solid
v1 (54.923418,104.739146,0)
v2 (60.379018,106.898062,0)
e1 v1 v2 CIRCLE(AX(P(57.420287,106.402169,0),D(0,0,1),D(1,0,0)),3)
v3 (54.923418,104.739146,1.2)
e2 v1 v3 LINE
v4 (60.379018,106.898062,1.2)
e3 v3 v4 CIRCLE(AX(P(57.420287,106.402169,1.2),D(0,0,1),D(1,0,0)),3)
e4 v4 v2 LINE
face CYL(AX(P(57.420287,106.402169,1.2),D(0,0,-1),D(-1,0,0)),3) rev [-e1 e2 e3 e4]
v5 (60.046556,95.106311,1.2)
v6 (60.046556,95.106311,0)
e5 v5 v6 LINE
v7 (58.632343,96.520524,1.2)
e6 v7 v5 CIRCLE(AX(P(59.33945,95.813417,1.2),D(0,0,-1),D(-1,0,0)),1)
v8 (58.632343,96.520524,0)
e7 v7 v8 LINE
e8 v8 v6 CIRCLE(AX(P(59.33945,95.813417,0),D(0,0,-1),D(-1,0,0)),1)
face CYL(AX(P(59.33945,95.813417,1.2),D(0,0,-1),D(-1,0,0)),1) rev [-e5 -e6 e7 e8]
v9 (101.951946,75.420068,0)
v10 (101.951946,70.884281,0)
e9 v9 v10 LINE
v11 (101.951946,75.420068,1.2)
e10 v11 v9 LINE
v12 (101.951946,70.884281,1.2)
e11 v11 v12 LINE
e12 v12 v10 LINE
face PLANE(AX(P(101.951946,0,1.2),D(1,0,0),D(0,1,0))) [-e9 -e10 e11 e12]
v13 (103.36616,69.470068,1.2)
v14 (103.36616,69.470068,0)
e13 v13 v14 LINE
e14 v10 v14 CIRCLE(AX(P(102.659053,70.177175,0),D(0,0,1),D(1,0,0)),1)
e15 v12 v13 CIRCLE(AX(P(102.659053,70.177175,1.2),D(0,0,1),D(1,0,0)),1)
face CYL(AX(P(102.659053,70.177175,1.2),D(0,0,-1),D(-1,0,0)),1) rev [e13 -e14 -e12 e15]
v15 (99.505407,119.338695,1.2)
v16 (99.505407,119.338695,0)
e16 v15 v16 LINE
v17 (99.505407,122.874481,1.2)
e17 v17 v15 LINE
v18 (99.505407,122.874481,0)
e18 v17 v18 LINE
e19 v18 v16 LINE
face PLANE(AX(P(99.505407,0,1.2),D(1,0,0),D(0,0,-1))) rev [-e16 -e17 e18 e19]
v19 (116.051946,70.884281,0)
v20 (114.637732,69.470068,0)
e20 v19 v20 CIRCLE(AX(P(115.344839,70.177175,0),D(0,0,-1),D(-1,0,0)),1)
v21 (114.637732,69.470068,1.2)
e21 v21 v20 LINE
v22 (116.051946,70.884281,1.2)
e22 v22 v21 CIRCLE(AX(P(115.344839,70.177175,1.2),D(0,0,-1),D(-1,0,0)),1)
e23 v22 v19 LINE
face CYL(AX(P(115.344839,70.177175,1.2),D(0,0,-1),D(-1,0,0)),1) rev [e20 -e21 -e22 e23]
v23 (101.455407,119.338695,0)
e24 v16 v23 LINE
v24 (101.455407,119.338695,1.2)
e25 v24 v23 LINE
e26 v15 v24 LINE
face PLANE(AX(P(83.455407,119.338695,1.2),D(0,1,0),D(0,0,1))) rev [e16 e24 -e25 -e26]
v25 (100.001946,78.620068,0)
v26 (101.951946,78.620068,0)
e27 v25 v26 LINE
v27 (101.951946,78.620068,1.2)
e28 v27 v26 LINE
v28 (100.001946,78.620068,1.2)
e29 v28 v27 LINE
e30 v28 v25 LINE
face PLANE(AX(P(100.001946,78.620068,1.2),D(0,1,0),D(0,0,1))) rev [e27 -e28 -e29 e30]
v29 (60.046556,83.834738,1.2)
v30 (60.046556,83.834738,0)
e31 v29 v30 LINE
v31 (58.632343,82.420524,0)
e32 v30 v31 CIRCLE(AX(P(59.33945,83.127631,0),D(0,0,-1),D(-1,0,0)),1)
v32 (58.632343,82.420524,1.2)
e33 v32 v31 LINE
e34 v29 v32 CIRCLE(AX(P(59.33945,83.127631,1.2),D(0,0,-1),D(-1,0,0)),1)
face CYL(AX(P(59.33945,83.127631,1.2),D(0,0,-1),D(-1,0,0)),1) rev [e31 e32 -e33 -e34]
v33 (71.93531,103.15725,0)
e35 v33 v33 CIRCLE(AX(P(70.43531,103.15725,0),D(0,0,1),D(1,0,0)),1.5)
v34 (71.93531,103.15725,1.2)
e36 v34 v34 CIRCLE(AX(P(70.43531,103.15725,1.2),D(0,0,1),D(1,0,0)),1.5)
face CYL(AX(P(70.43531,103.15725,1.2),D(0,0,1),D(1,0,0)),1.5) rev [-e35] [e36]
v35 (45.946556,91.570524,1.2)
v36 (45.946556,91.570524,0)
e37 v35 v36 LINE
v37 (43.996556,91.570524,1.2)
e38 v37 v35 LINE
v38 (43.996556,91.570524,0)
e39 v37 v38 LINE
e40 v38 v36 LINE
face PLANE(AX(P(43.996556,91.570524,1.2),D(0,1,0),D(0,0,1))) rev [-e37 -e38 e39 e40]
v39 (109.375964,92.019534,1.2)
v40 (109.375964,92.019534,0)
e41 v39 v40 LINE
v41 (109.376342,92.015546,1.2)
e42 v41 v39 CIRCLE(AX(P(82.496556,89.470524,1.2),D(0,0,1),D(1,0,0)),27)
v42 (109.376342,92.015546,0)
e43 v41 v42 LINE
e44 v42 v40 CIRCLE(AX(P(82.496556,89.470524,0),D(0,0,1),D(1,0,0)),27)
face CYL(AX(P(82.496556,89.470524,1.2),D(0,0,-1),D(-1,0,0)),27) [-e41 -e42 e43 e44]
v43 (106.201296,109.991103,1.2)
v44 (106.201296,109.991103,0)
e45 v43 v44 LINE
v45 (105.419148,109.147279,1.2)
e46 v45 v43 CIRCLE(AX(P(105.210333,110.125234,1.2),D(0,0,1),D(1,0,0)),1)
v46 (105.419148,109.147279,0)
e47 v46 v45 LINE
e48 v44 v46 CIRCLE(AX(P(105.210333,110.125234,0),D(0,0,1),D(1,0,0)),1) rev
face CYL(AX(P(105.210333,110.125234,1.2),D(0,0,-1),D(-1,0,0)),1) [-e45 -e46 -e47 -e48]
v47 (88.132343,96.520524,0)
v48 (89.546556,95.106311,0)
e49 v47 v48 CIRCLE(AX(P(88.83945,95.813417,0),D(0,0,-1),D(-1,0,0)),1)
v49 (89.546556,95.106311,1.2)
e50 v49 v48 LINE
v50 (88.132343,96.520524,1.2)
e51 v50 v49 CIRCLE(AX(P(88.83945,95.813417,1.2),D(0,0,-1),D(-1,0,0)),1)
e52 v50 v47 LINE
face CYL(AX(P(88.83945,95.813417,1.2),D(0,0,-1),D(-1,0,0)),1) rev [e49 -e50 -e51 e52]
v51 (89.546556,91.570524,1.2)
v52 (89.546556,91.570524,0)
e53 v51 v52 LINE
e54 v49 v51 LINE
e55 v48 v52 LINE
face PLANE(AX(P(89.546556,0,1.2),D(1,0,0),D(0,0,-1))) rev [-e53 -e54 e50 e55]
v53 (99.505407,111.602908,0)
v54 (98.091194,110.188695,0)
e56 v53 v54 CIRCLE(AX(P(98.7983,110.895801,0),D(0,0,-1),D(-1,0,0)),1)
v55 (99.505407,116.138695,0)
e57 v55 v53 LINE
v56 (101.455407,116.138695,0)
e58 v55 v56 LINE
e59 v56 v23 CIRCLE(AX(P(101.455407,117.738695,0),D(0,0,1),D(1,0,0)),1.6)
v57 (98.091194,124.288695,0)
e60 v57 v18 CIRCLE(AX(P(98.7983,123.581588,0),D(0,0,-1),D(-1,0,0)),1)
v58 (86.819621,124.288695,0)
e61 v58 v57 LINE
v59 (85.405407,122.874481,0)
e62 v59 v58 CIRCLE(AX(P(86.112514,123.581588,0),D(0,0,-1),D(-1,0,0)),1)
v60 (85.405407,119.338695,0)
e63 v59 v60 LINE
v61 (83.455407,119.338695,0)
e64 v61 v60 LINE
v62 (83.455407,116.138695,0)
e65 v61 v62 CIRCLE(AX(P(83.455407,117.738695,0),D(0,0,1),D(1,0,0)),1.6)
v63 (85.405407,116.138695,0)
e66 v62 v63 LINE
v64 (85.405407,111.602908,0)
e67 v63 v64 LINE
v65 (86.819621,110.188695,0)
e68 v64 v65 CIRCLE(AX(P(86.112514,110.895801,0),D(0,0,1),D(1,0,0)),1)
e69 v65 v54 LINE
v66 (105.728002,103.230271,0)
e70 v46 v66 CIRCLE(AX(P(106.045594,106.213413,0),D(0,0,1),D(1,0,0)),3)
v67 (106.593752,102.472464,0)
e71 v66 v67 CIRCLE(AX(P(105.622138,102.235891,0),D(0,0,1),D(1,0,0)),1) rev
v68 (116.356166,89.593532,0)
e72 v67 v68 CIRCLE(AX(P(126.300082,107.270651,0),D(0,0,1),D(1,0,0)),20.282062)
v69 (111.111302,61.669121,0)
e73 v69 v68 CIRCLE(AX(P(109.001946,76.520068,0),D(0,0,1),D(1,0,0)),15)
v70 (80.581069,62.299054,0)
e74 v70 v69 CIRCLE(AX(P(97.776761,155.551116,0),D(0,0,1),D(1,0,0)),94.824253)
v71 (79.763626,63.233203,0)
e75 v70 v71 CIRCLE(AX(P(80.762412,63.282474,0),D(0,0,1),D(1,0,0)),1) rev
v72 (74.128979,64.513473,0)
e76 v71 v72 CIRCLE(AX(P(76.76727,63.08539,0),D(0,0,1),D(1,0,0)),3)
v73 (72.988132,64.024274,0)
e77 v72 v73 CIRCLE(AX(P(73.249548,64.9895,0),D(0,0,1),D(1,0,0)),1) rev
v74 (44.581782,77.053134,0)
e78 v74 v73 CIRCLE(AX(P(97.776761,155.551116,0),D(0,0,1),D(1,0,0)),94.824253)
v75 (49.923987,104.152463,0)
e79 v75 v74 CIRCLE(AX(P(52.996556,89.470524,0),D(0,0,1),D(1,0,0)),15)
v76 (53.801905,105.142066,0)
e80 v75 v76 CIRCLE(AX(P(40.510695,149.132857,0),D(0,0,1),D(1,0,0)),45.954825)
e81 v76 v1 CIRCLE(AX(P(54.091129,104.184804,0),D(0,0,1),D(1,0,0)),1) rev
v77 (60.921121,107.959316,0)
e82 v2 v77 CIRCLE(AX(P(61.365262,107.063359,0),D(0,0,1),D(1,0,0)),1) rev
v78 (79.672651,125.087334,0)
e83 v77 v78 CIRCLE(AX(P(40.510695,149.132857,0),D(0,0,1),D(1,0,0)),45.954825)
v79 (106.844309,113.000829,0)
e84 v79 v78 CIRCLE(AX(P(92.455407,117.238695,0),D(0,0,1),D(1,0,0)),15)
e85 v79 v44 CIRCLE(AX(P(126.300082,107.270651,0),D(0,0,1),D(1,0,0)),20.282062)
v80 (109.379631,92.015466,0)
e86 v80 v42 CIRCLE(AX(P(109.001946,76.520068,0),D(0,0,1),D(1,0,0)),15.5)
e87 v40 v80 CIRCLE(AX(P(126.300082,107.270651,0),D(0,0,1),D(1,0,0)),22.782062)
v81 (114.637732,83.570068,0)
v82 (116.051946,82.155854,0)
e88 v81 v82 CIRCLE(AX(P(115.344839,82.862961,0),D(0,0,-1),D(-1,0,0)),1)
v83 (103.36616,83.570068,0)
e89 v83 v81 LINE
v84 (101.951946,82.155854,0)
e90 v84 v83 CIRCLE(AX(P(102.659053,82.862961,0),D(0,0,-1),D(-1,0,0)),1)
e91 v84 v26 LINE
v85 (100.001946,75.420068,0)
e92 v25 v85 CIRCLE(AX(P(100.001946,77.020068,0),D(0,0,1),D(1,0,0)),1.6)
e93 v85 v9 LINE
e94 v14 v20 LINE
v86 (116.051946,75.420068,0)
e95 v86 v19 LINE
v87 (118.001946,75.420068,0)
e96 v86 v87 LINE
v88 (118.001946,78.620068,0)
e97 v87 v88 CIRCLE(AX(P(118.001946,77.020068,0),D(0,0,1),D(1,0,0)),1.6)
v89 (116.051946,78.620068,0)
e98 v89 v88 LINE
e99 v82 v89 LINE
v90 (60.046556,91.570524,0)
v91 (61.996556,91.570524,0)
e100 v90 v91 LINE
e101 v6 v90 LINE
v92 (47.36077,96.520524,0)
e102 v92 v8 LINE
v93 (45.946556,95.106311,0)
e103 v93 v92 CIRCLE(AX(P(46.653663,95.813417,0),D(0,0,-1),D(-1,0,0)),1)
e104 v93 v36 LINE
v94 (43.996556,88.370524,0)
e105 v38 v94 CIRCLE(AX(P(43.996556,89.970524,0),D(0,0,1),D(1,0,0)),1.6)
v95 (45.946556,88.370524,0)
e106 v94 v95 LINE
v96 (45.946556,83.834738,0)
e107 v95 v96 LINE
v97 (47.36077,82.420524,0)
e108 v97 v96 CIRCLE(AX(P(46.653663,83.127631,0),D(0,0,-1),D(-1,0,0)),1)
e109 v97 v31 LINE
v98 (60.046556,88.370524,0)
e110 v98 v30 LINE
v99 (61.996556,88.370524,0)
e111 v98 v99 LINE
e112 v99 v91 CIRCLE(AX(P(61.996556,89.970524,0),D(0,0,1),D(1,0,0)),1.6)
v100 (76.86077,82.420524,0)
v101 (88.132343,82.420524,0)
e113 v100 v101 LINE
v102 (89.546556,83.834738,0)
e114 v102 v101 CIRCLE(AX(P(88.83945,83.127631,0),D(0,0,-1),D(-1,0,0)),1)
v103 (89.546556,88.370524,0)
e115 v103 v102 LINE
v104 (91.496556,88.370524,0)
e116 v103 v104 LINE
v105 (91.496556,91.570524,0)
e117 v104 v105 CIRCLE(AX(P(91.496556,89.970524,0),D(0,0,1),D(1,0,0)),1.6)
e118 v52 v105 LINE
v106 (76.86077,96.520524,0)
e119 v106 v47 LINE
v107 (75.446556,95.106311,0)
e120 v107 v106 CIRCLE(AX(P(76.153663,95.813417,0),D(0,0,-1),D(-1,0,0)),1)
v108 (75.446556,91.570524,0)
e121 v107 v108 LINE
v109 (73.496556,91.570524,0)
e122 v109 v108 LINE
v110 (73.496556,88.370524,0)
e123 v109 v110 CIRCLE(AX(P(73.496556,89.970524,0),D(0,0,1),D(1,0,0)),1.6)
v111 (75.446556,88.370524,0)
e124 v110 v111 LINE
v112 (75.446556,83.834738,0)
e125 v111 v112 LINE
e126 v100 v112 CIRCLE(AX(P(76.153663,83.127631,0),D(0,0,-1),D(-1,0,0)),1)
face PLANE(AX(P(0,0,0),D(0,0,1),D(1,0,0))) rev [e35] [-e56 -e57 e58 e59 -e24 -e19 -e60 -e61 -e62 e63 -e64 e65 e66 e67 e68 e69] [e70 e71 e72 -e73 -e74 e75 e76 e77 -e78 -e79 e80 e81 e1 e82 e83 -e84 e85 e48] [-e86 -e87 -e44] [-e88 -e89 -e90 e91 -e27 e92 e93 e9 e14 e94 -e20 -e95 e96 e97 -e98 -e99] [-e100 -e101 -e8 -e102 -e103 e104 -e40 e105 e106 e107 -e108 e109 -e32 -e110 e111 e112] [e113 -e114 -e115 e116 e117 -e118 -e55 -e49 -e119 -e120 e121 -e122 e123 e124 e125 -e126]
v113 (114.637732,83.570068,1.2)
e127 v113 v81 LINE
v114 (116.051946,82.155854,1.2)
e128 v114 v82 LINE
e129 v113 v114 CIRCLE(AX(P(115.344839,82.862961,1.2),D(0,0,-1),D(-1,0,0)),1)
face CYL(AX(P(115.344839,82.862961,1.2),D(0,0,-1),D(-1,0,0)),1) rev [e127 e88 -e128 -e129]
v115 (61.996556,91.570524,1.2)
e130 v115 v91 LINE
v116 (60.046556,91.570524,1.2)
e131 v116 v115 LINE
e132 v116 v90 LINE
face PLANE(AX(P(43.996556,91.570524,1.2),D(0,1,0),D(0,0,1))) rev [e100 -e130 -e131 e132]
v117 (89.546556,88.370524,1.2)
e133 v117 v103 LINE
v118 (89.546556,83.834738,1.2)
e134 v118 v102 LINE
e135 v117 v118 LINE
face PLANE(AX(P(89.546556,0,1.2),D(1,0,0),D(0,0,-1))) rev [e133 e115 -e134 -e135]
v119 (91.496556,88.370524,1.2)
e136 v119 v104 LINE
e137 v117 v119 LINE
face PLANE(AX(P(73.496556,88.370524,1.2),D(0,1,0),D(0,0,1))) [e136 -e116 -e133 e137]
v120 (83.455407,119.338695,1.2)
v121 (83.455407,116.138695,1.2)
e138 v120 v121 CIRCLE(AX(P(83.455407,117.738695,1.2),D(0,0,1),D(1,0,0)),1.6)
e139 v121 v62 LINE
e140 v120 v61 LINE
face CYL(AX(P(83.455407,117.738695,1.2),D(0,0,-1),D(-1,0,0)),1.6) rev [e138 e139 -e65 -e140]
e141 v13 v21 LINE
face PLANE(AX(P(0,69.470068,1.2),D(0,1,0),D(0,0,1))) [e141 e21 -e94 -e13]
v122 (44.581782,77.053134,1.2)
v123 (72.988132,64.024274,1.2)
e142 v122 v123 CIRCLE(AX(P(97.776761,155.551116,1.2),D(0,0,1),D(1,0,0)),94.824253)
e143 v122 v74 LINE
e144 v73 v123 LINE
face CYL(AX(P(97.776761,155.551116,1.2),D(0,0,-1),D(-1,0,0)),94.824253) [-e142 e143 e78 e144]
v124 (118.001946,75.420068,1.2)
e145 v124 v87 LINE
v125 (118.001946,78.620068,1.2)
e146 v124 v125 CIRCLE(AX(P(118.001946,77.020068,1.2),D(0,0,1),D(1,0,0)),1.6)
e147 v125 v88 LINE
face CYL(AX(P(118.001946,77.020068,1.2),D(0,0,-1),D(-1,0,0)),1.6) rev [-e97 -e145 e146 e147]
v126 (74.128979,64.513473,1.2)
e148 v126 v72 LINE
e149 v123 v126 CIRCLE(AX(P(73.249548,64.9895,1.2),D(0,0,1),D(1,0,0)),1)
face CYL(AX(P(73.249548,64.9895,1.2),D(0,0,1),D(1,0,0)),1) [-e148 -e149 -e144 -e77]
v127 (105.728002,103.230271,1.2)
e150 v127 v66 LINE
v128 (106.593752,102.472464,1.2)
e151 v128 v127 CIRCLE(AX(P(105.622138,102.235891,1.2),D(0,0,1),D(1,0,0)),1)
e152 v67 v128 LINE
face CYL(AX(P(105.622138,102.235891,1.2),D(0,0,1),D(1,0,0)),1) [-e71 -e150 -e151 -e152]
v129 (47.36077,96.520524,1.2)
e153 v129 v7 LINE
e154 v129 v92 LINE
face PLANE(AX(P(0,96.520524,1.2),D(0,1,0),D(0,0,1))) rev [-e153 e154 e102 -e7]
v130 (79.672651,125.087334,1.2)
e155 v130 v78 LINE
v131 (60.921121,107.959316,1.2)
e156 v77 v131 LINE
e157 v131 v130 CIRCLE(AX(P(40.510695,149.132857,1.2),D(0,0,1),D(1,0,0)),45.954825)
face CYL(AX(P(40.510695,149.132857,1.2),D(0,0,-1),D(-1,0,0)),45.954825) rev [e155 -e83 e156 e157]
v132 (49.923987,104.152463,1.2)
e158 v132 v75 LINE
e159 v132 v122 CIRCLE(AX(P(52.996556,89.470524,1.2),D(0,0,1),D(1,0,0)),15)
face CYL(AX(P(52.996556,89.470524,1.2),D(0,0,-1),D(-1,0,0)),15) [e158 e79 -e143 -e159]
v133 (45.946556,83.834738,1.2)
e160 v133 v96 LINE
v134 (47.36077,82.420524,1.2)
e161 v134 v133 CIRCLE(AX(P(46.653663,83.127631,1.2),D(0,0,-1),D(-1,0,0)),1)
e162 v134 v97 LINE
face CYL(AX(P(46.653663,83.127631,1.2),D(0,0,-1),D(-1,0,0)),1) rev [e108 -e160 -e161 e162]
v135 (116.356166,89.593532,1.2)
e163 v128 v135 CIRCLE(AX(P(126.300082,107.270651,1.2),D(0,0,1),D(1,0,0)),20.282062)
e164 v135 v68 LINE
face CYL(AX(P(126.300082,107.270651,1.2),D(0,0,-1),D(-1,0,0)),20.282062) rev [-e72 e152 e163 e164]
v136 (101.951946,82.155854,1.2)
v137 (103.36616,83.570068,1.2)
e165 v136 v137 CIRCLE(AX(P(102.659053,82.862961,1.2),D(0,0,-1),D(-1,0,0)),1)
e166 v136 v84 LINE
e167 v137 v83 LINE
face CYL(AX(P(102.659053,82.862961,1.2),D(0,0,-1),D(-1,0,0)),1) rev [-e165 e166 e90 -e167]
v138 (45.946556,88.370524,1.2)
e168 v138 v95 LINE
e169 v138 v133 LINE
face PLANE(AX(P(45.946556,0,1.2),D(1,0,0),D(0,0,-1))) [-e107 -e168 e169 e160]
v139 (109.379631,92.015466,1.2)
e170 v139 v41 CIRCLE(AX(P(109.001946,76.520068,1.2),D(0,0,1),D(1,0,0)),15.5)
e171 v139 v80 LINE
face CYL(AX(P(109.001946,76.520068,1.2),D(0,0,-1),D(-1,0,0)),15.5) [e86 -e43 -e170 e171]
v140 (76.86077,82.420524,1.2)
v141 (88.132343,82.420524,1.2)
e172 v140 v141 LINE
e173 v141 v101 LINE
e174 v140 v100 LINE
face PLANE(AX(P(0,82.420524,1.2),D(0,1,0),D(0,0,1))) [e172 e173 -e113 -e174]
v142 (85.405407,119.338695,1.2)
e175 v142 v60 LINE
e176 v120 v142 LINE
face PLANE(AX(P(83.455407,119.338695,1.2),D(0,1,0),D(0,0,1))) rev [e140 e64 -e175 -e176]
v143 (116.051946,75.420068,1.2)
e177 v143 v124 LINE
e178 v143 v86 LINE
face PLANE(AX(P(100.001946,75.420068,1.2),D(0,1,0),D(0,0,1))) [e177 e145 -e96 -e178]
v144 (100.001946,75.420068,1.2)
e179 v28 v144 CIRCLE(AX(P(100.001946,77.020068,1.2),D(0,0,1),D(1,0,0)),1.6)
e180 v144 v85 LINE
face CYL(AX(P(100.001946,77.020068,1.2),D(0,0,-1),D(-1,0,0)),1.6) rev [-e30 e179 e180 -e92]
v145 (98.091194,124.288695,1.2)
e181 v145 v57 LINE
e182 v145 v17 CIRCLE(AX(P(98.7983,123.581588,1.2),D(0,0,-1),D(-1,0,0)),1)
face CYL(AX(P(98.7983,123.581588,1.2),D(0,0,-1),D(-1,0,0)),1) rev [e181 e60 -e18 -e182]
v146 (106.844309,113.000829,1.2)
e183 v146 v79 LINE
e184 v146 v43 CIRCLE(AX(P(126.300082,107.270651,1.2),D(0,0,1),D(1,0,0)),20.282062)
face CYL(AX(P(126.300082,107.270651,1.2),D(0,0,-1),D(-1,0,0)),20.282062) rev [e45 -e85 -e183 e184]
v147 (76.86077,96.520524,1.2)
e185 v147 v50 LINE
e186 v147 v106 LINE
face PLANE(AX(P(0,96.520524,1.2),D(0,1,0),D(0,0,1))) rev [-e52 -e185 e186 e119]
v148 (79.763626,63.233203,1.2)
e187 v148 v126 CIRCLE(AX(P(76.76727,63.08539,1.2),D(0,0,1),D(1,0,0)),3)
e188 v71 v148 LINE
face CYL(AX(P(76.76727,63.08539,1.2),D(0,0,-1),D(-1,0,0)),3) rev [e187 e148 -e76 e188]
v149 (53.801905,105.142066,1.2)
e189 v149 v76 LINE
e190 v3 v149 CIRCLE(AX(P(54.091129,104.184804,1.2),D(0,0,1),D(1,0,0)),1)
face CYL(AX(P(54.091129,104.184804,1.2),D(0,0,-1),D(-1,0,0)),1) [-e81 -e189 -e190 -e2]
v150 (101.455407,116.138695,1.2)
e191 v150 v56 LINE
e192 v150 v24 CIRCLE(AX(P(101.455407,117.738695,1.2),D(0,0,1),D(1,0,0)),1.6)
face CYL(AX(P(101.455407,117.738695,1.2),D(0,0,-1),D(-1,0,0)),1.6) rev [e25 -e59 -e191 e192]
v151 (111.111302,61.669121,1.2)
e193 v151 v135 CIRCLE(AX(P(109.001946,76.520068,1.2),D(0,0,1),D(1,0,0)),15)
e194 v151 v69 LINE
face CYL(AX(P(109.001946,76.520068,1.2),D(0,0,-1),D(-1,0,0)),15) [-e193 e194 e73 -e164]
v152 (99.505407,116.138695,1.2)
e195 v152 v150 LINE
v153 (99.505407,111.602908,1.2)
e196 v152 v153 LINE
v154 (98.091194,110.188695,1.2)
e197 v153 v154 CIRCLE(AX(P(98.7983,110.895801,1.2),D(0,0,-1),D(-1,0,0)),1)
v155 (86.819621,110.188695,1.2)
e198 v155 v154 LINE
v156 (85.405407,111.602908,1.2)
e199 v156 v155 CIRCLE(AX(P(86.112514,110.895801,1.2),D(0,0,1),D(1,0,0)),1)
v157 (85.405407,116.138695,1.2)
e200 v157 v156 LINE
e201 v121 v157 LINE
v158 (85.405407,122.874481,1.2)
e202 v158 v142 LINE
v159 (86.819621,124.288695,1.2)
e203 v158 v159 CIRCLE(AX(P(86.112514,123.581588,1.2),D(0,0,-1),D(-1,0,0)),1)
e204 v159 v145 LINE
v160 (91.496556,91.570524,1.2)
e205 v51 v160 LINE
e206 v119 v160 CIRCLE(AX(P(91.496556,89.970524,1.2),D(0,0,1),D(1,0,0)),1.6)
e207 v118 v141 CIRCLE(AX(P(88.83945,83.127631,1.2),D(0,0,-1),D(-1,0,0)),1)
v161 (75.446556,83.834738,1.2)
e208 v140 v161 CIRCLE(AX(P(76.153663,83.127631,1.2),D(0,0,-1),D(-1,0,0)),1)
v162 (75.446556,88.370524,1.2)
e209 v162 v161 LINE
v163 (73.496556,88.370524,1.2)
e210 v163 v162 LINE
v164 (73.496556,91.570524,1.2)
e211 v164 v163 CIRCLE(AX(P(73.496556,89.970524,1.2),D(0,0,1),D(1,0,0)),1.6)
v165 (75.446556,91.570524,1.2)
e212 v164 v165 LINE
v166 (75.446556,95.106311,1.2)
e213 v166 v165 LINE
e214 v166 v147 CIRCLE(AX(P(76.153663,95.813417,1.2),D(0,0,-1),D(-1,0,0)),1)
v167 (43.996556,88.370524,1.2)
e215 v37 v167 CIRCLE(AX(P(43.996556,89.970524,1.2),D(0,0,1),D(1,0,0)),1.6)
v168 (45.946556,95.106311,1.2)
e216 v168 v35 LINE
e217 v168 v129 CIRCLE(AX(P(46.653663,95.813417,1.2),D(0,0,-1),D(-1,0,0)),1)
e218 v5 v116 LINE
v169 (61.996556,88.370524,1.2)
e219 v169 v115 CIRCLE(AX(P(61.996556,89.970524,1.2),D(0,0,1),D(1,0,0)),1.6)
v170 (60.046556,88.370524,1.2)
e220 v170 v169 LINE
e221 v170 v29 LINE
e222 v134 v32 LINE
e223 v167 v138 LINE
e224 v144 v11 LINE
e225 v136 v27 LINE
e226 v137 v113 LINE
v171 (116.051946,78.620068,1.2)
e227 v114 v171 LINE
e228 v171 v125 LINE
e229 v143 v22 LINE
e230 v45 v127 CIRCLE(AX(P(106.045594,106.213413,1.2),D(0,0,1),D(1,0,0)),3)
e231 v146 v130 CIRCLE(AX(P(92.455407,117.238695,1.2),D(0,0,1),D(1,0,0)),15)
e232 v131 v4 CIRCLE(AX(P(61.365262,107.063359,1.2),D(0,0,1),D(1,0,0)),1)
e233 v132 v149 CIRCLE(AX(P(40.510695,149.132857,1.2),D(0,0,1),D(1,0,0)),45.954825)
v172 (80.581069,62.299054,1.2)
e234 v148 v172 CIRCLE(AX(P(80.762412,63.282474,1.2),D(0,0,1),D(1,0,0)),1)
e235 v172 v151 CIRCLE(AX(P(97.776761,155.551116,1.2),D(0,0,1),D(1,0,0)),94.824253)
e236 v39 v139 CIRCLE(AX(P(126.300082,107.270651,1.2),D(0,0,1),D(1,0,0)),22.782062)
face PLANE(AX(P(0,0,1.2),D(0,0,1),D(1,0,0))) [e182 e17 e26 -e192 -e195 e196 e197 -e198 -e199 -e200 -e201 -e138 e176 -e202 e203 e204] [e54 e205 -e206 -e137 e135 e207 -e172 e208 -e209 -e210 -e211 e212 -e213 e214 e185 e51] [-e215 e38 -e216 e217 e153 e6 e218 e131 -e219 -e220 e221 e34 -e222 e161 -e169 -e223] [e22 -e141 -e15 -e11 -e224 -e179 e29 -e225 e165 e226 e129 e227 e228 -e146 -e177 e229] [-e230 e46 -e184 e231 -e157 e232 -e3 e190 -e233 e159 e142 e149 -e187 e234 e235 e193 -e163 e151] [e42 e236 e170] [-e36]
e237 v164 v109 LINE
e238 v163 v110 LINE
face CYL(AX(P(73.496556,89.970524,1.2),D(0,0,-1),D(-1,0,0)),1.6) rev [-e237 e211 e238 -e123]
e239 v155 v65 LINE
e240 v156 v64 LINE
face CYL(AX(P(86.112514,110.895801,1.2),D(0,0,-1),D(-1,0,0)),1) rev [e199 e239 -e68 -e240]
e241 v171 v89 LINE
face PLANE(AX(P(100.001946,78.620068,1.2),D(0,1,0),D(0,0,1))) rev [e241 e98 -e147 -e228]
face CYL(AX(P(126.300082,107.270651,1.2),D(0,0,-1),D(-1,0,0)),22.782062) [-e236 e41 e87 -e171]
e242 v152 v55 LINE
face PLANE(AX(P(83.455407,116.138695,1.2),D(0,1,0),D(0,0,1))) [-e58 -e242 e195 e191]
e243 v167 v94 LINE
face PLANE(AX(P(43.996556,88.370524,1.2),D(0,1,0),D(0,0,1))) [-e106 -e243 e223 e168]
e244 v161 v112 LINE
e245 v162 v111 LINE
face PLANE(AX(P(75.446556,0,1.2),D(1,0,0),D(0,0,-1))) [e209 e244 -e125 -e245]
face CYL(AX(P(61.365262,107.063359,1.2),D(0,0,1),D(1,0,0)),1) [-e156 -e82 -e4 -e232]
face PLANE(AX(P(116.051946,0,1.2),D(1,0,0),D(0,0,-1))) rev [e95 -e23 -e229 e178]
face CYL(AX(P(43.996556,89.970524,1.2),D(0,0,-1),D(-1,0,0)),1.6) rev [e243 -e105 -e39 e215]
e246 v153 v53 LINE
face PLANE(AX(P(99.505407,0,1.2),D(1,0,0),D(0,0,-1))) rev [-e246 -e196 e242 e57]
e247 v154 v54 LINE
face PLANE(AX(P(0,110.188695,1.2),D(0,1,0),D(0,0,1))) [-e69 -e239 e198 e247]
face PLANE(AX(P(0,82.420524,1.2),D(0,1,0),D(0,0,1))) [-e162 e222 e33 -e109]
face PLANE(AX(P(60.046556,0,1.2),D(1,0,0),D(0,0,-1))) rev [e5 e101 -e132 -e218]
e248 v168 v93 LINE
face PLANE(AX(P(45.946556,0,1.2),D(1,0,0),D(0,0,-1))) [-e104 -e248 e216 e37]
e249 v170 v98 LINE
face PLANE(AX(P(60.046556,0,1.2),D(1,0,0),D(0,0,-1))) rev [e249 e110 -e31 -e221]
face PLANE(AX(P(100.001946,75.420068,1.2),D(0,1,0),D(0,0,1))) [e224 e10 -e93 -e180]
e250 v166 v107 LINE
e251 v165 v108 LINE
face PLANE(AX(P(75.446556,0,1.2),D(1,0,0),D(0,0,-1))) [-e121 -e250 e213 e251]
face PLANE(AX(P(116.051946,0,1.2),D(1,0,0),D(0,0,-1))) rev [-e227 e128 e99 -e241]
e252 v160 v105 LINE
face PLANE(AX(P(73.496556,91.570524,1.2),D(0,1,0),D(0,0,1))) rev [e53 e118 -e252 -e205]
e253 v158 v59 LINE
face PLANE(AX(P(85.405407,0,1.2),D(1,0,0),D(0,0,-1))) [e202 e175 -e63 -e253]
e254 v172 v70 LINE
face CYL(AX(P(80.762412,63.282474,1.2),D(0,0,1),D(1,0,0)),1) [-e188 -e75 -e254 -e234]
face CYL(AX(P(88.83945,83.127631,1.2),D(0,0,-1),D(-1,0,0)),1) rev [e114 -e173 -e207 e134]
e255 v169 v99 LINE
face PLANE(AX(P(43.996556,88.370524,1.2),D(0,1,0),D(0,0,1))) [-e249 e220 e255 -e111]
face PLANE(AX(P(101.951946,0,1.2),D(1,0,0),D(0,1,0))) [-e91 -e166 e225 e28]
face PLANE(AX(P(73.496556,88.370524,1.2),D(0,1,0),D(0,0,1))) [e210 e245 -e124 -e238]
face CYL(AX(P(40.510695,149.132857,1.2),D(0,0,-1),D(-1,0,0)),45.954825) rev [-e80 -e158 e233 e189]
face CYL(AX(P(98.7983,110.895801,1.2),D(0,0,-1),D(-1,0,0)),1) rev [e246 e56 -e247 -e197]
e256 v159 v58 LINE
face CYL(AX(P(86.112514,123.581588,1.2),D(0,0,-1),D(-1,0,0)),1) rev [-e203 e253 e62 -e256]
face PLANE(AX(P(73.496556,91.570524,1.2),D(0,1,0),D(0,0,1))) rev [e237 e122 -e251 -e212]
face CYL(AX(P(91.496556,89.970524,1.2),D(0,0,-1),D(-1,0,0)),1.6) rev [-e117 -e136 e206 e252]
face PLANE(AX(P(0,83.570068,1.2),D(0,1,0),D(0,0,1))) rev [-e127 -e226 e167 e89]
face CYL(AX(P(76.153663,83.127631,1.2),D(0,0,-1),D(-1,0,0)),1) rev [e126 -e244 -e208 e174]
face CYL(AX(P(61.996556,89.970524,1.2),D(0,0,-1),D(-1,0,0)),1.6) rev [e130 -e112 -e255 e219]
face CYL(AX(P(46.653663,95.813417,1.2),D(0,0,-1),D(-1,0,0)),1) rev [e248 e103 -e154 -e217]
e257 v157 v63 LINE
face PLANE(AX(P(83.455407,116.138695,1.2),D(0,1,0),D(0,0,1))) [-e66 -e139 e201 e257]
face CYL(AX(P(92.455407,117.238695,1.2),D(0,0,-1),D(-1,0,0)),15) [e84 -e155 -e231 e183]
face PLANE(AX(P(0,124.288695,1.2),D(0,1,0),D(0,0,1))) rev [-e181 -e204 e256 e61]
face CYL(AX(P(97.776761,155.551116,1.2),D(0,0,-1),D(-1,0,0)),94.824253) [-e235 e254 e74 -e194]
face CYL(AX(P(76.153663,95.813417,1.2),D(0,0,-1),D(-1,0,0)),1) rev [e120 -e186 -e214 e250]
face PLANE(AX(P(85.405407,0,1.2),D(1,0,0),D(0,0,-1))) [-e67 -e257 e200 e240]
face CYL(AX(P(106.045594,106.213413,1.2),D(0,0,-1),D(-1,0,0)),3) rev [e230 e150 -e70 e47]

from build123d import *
from build123d.topology import SkipClean

# Parameters (mm, degrees)
BOSS_EXTRUDE1_DEPTH   = 1.2
SKETCH8_3_R           = 3
CUT_EXTRUDE1_DEPTH    = 182.287051241
SKETCH16_R            = 1.6
SKETCH16_W            = 18
SKETCH16_H            = 3.2
CUT_EXTRUDE2_DEPTH    = 182.287051241
CUT_EXTRUDE3_DEPTH    = 182.287051241
SKETCH9_W             = 14.1
SKETCH9_H             = 14.1
CUT_EXTRUDE4_DEPTH    = 182.287051241
F_3_0MM_DOWEL_HOLE1_D = 3
FILLET1_R             = 1


with BuildPart() as part:
    # Sketch8 → Boss-Extrude1 (new body)
    with BuildSketch(Plane.XY):
        with BuildLine():
            ThreePointArc((73.852303576, 63.794594289), (73.863549821, 63.839319131), (73.875482243, 63.883865813))
            ThreePointArc((73.875482243, 63.883865813), (76.767270103, 63.085390407), (79.729789892, 62.612657392))
            ThreePointArc((79.729789892, 62.612657392), (79.717062502, 62.538833177), (79.702495752, 62.465349771))
            ThreePointArc((79.702495752, 62.465349771), (95.373691885, 60.7573177), (111.111302129, 61.669121188))
            ThreePointArc((111.111302129, 61.669121188), (123.74416397, 73.75113123), (116.356165737, 89.593531525))
            ThreePointArc((116.356165737, 89.593531525), (107.510169126, 99.635128091), (106.844308874, 113.000828513))
            ThreePointArc((106.844308874, 113.000828513), (98.551785503, 130.943955248), (79.67265081, 125.087333856))
            ThreePointArc((79.67265081, 125.087333856), (66.957923375, 111.551078569), (49.923987164, 104.152462611))
            ThreePointArc((49.923987164, 104.152462611), (38.279791522, 92.371702096), (44.581782069, 77.053134095))
            ThreePointArc((44.581782069, 77.053134095), (58.651333394, 69.17496271), (73.852303576, 63.794594289))
        make_face()
        with BuildLine():
            ThreePointArc((56.72077423, 104.000844147), (56.721683918, 104.00117089), (56.7225936, 104.001497652))
            ThreePointArc((56.7225936, 104.001497652), (56.755397532, 103.992206145), (56.788325126, 103.983362865))
            ThreePointArc((56.788325126, 103.983362865), (56.754559843, 103.992142785), (56.72077423, 104.000844147))
        make_face(mode=Mode.SUBTRACT)
        with BuildLine():
            ThreePointArc((109.376341775, 92.015545509), (109.37615287, 92.017539878), (109.375963817, 92.019534234))
            ThreePointArc((109.375963817, 92.019534234), (109.377797318, 92.017499849), (109.379631064, 92.015465685))
            ThreePointArc((109.379631064, 92.015465685), (109.377986421, 92.015505684), (109.376341775, 92.015545509))
        make_face(mode=Mode.SUBTRACT)
        with BuildLine():
            ThreePointArc((103.532400156, 106.396636288), (103.543227812, 106.407709628), (103.554044399, 106.418793781))
            ThreePointArc((103.554044399, 106.418793781), (103.552293137, 106.396310438), (103.550744757, 106.373812212))
            ThreePointArc((103.550744757, 106.373812212), (103.541575551, 106.385226737), (103.532400156, 106.396636288))
        make_face(mode=Mode.SUBTRACT)
        with BuildLine():
            ThreePointArc((104.021801646, 107.681154775), (104.021865069, 107.684582448), (104.021929019, 107.688010111))
            ThreePointArc((104.021929019, 107.688010111), (104.063142491, 107.7381429), (104.104138674, 107.788453533))
            ThreePointArc((104.104138674, 107.788453533), (104.062244422, 107.735361058), (104.021801646, 107.681154775))
        make_face(mode=Mode.SUBTRACT)
    extrude(amount=BOSS_EXTRUDE1_DEPTH)

    # Sketch8<3> → Cut-Extrude1 (cut, through all)
    with SkipClean():  # the faces are left unmerged after this step: merging them gives an invalid solid
        with BuildSketch(Plane.XY):
            with Locations((106.04559389, 106.21341333)):
                Circle(SKETCH8_3_R)
            with Locations((76.767270103, 63.085390407)):
                Circle(SKETCH8_3_R)
            with Locations((57.420286528, 106.402169345)):
                Circle(SKETCH8_3_R)
        extrude(amount=CUT_EXTRUDE1_DEPTH, mode=Mode.SUBTRACT)

    # Sketch16 → Cut-Extrude2 (cut, through all)
    with SkipClean():  # the faces are left unmerged after this step: merging them gives an invalid solid
        with BuildSketch(Plane.XY):
            with Locations((43.996556322, 89.970524089)):
                Circle(SKETCH16_R)
            with Locations((61.996556322, 89.970524089)):
                Circle(SKETCH16_R)
            with Locations((73.496556322, 89.970524089)):
                Circle(SKETCH16_R)
            with Locations((91.496556322, 89.970524089)):
                Circle(SKETCH16_R)
            with Locations((100.001946024, 77.020067852)):
                Circle(SKETCH16_R)
            with Locations((118.001946024, 77.020067852)):
                Circle(SKETCH16_R)
            with Locations((83.45540719, 117.738694526)):
                Circle(SKETCH16_R)
            with Locations((101.45540719, 117.738694526)):
                Circle(SKETCH16_R)
            with Locations((52.996556322, 89.970524089)):
                Rectangle(SKETCH16_W, SKETCH16_H)
            with Locations((82.496556322, 89.970524089)):
                Rectangle(SKETCH16_W, SKETCH16_H)
            with Locations((109.001946024, 77.020067852)):
                Rectangle(SKETCH16_W, SKETCH16_H)
            with Locations((92.45540719, 117.738694526)):
                Rectangle(SKETCH16_W, SKETCH16_H)
        extrude(amount=CUT_EXTRUDE2_DEPTH, mode=Mode.SUBTRACT)

    # Sketch14 → Cut-Extrude3 (cut, through all)
    with SkipClean():  # the faces are left unmerged after this step: merging them gives an invalid solid
        with BuildSketch(Plane.XY):
            with BuildLine():
                Line((45.946556322, 95.106310527), (47.360769884, 96.520524089))
                ThreePointArc((47.360769884, 96.520524089), (45.946556322, 96.520524089), (45.946556322, 95.106310527))
            make_face()
            with BuildLine():
                Line((45.946556322, 83.834737652), (47.360769884, 82.420524089))
                ThreePointArc((47.360769884, 82.420524089), (45.946556322, 82.420524089), (45.946556322, 83.834737652))
            make_face()
            with BuildLine():
                Line((58.63234276, 82.420524089), (60.046556322, 83.834737652))
                ThreePointArc((60.046556322, 83.834737652), (60.046556322, 82.420524089), (58.63234276, 82.420524089))
            make_face()
            with BuildLine():
                Line((58.63234276, 96.520524089), (60.046556322, 95.106310527))
                ThreePointArc((60.046556322, 95.106310527), (60.046556322, 96.520524089), (58.63234276, 96.520524089))
            make_face()
            with BuildLine():
                Line((85.40540719, 111.602908088), (86.819620752, 110.188694526))
                ThreePointArc((86.819620752, 110.188694526), (85.40540719, 110.188694526), (85.40540719, 111.602908088))
            make_face()
            with BuildLine():
                Line((98.091193628, 110.188694526), (99.50540719, 111.602908088))
                ThreePointArc((99.50540719, 111.602908088), (99.50540719, 110.188694526), (98.091193628, 110.188694526))
            make_face()
            with BuildLine():
                Line((98.091193628, 124.288694526), (99.50540719, 122.874480963))
                ThreePointArc((99.50540719, 122.874480963), (99.50540719, 124.288694526), (98.091193628, 124.288694526))
            make_face()
            with BuildLine():
                Line((85.40540719, 122.874480963), (86.819620752, 124.288694526))
                ThreePointArc((86.819620752, 124.288694526), (85.40540719, 124.288694526), (85.40540719, 122.874480963))
            make_face()
            with BuildLine():
                Line((101.951946024, 82.155854289), (103.366159586, 83.570067852))
                ThreePointArc((103.366159586, 83.570067852), (101.951946024, 83.570067852), (101.951946024, 82.155854289))
            make_face()
            with BuildLine():
                Line((101.951946024, 70.884281414), (103.366159586, 69.470067852))
                ThreePointArc((103.366159586, 69.470067852), (101.951946024, 69.470067852), (101.951946024, 70.884281414))
            make_face()
            with BuildLine():
                Line((114.637732461, 69.470067852), (116.051946024, 70.884281414))
                ThreePointArc((116.051946024, 70.884281414), (116.051946024, 69.470067852), (114.637732461, 69.470067852))
            make_face()
            with BuildLine():
                Line((116.051946024, 82.155854289), (114.637732461, 83.570067852))
                ThreePointArc((114.637732461, 83.570067852), (116.051946024, 83.570067852), (116.051946024, 82.155854289))
            make_face()
            with BuildLine():
                Line((76.860769884, 96.520524089), (75.446556322, 95.106310527))
                ThreePointArc((75.446556322, 95.106310527), (75.446556322, 96.520524089), (76.860769884, 96.520524089))
            make_face()
            with BuildLine():
                Line((88.13234276, 96.520524089), (89.546556322, 95.106310527))
                ThreePointArc((89.546556322, 95.106310527), (89.546556322, 96.520524089), (88.13234276, 96.520524089))
            make_face()
            with BuildLine():
                Line((89.546556322, 83.834737652), (88.13234276, 82.420524089))
                ThreePointArc((88.13234276, 82.420524089), (89.546556322, 82.420524089), (89.546556322, 83.834737652))
            make_face()
            with BuildLine():
                Line((75.446556322, 83.834737652), (76.860769884, 82.420524089))
                ThreePointArc((76.860769884, 82.420524089), (75.446556322, 82.420524089), (75.446556322, 83.834737652))
            make_face()
        extrude(amount=CUT_EXTRUDE3_DEPTH, mode=Mode.SUBTRACT)

    # Sketch9 → Cut-Extrude4 (cut, through all)
    with SkipClean():  # the faces are left unmerged after this step: merging them gives an invalid solid
        with BuildSketch(Plane.XY):
            with Locations((52.996556322, 89.470524089)):
                Rectangle(SKETCH9_W, SKETCH9_H)
            with Locations((82.496556322, 89.470524089)):
                Rectangle(SKETCH9_W, SKETCH9_H)
            with Locations((109.001946024, 76.520067852)):
                Rectangle(SKETCH9_W, SKETCH9_H)
            with Locations((92.45540719, 117.238694526)):
                Rectangle(SKETCH9_W, SKETCH9_H)
        extrude(amount=CUT_EXTRUDE4_DEPTH, mode=Mode.SUBTRACT)

    # Ø3.0mm Dowel Hole1 (through all)
    with Locations(Plane.XY.offset(1.2)):
        with Locations((70.435309654, 103.157249982)):
            Hole(F_3_0MM_DOWEL_HOLE1_D / 2)

    # Fillet1
    fillet1_edges = [part.edges().sort_by_distance(p)[0] for p in [
        (79.702495752, 62.465349771, 0.6),
        (73.852303576, 63.794594289, 0.6),
        (106.42311517, 103.237261841, 0.6),
        (106.111211206, 109.212695638, 0.6),
        (54.596217873, 105.389926178, 0.6),
        (60.17229201, 107.596516793, 0.6),
    ]]
    fillet(fillet1_edges, radius=FILLET1_R)


solid = part.part
